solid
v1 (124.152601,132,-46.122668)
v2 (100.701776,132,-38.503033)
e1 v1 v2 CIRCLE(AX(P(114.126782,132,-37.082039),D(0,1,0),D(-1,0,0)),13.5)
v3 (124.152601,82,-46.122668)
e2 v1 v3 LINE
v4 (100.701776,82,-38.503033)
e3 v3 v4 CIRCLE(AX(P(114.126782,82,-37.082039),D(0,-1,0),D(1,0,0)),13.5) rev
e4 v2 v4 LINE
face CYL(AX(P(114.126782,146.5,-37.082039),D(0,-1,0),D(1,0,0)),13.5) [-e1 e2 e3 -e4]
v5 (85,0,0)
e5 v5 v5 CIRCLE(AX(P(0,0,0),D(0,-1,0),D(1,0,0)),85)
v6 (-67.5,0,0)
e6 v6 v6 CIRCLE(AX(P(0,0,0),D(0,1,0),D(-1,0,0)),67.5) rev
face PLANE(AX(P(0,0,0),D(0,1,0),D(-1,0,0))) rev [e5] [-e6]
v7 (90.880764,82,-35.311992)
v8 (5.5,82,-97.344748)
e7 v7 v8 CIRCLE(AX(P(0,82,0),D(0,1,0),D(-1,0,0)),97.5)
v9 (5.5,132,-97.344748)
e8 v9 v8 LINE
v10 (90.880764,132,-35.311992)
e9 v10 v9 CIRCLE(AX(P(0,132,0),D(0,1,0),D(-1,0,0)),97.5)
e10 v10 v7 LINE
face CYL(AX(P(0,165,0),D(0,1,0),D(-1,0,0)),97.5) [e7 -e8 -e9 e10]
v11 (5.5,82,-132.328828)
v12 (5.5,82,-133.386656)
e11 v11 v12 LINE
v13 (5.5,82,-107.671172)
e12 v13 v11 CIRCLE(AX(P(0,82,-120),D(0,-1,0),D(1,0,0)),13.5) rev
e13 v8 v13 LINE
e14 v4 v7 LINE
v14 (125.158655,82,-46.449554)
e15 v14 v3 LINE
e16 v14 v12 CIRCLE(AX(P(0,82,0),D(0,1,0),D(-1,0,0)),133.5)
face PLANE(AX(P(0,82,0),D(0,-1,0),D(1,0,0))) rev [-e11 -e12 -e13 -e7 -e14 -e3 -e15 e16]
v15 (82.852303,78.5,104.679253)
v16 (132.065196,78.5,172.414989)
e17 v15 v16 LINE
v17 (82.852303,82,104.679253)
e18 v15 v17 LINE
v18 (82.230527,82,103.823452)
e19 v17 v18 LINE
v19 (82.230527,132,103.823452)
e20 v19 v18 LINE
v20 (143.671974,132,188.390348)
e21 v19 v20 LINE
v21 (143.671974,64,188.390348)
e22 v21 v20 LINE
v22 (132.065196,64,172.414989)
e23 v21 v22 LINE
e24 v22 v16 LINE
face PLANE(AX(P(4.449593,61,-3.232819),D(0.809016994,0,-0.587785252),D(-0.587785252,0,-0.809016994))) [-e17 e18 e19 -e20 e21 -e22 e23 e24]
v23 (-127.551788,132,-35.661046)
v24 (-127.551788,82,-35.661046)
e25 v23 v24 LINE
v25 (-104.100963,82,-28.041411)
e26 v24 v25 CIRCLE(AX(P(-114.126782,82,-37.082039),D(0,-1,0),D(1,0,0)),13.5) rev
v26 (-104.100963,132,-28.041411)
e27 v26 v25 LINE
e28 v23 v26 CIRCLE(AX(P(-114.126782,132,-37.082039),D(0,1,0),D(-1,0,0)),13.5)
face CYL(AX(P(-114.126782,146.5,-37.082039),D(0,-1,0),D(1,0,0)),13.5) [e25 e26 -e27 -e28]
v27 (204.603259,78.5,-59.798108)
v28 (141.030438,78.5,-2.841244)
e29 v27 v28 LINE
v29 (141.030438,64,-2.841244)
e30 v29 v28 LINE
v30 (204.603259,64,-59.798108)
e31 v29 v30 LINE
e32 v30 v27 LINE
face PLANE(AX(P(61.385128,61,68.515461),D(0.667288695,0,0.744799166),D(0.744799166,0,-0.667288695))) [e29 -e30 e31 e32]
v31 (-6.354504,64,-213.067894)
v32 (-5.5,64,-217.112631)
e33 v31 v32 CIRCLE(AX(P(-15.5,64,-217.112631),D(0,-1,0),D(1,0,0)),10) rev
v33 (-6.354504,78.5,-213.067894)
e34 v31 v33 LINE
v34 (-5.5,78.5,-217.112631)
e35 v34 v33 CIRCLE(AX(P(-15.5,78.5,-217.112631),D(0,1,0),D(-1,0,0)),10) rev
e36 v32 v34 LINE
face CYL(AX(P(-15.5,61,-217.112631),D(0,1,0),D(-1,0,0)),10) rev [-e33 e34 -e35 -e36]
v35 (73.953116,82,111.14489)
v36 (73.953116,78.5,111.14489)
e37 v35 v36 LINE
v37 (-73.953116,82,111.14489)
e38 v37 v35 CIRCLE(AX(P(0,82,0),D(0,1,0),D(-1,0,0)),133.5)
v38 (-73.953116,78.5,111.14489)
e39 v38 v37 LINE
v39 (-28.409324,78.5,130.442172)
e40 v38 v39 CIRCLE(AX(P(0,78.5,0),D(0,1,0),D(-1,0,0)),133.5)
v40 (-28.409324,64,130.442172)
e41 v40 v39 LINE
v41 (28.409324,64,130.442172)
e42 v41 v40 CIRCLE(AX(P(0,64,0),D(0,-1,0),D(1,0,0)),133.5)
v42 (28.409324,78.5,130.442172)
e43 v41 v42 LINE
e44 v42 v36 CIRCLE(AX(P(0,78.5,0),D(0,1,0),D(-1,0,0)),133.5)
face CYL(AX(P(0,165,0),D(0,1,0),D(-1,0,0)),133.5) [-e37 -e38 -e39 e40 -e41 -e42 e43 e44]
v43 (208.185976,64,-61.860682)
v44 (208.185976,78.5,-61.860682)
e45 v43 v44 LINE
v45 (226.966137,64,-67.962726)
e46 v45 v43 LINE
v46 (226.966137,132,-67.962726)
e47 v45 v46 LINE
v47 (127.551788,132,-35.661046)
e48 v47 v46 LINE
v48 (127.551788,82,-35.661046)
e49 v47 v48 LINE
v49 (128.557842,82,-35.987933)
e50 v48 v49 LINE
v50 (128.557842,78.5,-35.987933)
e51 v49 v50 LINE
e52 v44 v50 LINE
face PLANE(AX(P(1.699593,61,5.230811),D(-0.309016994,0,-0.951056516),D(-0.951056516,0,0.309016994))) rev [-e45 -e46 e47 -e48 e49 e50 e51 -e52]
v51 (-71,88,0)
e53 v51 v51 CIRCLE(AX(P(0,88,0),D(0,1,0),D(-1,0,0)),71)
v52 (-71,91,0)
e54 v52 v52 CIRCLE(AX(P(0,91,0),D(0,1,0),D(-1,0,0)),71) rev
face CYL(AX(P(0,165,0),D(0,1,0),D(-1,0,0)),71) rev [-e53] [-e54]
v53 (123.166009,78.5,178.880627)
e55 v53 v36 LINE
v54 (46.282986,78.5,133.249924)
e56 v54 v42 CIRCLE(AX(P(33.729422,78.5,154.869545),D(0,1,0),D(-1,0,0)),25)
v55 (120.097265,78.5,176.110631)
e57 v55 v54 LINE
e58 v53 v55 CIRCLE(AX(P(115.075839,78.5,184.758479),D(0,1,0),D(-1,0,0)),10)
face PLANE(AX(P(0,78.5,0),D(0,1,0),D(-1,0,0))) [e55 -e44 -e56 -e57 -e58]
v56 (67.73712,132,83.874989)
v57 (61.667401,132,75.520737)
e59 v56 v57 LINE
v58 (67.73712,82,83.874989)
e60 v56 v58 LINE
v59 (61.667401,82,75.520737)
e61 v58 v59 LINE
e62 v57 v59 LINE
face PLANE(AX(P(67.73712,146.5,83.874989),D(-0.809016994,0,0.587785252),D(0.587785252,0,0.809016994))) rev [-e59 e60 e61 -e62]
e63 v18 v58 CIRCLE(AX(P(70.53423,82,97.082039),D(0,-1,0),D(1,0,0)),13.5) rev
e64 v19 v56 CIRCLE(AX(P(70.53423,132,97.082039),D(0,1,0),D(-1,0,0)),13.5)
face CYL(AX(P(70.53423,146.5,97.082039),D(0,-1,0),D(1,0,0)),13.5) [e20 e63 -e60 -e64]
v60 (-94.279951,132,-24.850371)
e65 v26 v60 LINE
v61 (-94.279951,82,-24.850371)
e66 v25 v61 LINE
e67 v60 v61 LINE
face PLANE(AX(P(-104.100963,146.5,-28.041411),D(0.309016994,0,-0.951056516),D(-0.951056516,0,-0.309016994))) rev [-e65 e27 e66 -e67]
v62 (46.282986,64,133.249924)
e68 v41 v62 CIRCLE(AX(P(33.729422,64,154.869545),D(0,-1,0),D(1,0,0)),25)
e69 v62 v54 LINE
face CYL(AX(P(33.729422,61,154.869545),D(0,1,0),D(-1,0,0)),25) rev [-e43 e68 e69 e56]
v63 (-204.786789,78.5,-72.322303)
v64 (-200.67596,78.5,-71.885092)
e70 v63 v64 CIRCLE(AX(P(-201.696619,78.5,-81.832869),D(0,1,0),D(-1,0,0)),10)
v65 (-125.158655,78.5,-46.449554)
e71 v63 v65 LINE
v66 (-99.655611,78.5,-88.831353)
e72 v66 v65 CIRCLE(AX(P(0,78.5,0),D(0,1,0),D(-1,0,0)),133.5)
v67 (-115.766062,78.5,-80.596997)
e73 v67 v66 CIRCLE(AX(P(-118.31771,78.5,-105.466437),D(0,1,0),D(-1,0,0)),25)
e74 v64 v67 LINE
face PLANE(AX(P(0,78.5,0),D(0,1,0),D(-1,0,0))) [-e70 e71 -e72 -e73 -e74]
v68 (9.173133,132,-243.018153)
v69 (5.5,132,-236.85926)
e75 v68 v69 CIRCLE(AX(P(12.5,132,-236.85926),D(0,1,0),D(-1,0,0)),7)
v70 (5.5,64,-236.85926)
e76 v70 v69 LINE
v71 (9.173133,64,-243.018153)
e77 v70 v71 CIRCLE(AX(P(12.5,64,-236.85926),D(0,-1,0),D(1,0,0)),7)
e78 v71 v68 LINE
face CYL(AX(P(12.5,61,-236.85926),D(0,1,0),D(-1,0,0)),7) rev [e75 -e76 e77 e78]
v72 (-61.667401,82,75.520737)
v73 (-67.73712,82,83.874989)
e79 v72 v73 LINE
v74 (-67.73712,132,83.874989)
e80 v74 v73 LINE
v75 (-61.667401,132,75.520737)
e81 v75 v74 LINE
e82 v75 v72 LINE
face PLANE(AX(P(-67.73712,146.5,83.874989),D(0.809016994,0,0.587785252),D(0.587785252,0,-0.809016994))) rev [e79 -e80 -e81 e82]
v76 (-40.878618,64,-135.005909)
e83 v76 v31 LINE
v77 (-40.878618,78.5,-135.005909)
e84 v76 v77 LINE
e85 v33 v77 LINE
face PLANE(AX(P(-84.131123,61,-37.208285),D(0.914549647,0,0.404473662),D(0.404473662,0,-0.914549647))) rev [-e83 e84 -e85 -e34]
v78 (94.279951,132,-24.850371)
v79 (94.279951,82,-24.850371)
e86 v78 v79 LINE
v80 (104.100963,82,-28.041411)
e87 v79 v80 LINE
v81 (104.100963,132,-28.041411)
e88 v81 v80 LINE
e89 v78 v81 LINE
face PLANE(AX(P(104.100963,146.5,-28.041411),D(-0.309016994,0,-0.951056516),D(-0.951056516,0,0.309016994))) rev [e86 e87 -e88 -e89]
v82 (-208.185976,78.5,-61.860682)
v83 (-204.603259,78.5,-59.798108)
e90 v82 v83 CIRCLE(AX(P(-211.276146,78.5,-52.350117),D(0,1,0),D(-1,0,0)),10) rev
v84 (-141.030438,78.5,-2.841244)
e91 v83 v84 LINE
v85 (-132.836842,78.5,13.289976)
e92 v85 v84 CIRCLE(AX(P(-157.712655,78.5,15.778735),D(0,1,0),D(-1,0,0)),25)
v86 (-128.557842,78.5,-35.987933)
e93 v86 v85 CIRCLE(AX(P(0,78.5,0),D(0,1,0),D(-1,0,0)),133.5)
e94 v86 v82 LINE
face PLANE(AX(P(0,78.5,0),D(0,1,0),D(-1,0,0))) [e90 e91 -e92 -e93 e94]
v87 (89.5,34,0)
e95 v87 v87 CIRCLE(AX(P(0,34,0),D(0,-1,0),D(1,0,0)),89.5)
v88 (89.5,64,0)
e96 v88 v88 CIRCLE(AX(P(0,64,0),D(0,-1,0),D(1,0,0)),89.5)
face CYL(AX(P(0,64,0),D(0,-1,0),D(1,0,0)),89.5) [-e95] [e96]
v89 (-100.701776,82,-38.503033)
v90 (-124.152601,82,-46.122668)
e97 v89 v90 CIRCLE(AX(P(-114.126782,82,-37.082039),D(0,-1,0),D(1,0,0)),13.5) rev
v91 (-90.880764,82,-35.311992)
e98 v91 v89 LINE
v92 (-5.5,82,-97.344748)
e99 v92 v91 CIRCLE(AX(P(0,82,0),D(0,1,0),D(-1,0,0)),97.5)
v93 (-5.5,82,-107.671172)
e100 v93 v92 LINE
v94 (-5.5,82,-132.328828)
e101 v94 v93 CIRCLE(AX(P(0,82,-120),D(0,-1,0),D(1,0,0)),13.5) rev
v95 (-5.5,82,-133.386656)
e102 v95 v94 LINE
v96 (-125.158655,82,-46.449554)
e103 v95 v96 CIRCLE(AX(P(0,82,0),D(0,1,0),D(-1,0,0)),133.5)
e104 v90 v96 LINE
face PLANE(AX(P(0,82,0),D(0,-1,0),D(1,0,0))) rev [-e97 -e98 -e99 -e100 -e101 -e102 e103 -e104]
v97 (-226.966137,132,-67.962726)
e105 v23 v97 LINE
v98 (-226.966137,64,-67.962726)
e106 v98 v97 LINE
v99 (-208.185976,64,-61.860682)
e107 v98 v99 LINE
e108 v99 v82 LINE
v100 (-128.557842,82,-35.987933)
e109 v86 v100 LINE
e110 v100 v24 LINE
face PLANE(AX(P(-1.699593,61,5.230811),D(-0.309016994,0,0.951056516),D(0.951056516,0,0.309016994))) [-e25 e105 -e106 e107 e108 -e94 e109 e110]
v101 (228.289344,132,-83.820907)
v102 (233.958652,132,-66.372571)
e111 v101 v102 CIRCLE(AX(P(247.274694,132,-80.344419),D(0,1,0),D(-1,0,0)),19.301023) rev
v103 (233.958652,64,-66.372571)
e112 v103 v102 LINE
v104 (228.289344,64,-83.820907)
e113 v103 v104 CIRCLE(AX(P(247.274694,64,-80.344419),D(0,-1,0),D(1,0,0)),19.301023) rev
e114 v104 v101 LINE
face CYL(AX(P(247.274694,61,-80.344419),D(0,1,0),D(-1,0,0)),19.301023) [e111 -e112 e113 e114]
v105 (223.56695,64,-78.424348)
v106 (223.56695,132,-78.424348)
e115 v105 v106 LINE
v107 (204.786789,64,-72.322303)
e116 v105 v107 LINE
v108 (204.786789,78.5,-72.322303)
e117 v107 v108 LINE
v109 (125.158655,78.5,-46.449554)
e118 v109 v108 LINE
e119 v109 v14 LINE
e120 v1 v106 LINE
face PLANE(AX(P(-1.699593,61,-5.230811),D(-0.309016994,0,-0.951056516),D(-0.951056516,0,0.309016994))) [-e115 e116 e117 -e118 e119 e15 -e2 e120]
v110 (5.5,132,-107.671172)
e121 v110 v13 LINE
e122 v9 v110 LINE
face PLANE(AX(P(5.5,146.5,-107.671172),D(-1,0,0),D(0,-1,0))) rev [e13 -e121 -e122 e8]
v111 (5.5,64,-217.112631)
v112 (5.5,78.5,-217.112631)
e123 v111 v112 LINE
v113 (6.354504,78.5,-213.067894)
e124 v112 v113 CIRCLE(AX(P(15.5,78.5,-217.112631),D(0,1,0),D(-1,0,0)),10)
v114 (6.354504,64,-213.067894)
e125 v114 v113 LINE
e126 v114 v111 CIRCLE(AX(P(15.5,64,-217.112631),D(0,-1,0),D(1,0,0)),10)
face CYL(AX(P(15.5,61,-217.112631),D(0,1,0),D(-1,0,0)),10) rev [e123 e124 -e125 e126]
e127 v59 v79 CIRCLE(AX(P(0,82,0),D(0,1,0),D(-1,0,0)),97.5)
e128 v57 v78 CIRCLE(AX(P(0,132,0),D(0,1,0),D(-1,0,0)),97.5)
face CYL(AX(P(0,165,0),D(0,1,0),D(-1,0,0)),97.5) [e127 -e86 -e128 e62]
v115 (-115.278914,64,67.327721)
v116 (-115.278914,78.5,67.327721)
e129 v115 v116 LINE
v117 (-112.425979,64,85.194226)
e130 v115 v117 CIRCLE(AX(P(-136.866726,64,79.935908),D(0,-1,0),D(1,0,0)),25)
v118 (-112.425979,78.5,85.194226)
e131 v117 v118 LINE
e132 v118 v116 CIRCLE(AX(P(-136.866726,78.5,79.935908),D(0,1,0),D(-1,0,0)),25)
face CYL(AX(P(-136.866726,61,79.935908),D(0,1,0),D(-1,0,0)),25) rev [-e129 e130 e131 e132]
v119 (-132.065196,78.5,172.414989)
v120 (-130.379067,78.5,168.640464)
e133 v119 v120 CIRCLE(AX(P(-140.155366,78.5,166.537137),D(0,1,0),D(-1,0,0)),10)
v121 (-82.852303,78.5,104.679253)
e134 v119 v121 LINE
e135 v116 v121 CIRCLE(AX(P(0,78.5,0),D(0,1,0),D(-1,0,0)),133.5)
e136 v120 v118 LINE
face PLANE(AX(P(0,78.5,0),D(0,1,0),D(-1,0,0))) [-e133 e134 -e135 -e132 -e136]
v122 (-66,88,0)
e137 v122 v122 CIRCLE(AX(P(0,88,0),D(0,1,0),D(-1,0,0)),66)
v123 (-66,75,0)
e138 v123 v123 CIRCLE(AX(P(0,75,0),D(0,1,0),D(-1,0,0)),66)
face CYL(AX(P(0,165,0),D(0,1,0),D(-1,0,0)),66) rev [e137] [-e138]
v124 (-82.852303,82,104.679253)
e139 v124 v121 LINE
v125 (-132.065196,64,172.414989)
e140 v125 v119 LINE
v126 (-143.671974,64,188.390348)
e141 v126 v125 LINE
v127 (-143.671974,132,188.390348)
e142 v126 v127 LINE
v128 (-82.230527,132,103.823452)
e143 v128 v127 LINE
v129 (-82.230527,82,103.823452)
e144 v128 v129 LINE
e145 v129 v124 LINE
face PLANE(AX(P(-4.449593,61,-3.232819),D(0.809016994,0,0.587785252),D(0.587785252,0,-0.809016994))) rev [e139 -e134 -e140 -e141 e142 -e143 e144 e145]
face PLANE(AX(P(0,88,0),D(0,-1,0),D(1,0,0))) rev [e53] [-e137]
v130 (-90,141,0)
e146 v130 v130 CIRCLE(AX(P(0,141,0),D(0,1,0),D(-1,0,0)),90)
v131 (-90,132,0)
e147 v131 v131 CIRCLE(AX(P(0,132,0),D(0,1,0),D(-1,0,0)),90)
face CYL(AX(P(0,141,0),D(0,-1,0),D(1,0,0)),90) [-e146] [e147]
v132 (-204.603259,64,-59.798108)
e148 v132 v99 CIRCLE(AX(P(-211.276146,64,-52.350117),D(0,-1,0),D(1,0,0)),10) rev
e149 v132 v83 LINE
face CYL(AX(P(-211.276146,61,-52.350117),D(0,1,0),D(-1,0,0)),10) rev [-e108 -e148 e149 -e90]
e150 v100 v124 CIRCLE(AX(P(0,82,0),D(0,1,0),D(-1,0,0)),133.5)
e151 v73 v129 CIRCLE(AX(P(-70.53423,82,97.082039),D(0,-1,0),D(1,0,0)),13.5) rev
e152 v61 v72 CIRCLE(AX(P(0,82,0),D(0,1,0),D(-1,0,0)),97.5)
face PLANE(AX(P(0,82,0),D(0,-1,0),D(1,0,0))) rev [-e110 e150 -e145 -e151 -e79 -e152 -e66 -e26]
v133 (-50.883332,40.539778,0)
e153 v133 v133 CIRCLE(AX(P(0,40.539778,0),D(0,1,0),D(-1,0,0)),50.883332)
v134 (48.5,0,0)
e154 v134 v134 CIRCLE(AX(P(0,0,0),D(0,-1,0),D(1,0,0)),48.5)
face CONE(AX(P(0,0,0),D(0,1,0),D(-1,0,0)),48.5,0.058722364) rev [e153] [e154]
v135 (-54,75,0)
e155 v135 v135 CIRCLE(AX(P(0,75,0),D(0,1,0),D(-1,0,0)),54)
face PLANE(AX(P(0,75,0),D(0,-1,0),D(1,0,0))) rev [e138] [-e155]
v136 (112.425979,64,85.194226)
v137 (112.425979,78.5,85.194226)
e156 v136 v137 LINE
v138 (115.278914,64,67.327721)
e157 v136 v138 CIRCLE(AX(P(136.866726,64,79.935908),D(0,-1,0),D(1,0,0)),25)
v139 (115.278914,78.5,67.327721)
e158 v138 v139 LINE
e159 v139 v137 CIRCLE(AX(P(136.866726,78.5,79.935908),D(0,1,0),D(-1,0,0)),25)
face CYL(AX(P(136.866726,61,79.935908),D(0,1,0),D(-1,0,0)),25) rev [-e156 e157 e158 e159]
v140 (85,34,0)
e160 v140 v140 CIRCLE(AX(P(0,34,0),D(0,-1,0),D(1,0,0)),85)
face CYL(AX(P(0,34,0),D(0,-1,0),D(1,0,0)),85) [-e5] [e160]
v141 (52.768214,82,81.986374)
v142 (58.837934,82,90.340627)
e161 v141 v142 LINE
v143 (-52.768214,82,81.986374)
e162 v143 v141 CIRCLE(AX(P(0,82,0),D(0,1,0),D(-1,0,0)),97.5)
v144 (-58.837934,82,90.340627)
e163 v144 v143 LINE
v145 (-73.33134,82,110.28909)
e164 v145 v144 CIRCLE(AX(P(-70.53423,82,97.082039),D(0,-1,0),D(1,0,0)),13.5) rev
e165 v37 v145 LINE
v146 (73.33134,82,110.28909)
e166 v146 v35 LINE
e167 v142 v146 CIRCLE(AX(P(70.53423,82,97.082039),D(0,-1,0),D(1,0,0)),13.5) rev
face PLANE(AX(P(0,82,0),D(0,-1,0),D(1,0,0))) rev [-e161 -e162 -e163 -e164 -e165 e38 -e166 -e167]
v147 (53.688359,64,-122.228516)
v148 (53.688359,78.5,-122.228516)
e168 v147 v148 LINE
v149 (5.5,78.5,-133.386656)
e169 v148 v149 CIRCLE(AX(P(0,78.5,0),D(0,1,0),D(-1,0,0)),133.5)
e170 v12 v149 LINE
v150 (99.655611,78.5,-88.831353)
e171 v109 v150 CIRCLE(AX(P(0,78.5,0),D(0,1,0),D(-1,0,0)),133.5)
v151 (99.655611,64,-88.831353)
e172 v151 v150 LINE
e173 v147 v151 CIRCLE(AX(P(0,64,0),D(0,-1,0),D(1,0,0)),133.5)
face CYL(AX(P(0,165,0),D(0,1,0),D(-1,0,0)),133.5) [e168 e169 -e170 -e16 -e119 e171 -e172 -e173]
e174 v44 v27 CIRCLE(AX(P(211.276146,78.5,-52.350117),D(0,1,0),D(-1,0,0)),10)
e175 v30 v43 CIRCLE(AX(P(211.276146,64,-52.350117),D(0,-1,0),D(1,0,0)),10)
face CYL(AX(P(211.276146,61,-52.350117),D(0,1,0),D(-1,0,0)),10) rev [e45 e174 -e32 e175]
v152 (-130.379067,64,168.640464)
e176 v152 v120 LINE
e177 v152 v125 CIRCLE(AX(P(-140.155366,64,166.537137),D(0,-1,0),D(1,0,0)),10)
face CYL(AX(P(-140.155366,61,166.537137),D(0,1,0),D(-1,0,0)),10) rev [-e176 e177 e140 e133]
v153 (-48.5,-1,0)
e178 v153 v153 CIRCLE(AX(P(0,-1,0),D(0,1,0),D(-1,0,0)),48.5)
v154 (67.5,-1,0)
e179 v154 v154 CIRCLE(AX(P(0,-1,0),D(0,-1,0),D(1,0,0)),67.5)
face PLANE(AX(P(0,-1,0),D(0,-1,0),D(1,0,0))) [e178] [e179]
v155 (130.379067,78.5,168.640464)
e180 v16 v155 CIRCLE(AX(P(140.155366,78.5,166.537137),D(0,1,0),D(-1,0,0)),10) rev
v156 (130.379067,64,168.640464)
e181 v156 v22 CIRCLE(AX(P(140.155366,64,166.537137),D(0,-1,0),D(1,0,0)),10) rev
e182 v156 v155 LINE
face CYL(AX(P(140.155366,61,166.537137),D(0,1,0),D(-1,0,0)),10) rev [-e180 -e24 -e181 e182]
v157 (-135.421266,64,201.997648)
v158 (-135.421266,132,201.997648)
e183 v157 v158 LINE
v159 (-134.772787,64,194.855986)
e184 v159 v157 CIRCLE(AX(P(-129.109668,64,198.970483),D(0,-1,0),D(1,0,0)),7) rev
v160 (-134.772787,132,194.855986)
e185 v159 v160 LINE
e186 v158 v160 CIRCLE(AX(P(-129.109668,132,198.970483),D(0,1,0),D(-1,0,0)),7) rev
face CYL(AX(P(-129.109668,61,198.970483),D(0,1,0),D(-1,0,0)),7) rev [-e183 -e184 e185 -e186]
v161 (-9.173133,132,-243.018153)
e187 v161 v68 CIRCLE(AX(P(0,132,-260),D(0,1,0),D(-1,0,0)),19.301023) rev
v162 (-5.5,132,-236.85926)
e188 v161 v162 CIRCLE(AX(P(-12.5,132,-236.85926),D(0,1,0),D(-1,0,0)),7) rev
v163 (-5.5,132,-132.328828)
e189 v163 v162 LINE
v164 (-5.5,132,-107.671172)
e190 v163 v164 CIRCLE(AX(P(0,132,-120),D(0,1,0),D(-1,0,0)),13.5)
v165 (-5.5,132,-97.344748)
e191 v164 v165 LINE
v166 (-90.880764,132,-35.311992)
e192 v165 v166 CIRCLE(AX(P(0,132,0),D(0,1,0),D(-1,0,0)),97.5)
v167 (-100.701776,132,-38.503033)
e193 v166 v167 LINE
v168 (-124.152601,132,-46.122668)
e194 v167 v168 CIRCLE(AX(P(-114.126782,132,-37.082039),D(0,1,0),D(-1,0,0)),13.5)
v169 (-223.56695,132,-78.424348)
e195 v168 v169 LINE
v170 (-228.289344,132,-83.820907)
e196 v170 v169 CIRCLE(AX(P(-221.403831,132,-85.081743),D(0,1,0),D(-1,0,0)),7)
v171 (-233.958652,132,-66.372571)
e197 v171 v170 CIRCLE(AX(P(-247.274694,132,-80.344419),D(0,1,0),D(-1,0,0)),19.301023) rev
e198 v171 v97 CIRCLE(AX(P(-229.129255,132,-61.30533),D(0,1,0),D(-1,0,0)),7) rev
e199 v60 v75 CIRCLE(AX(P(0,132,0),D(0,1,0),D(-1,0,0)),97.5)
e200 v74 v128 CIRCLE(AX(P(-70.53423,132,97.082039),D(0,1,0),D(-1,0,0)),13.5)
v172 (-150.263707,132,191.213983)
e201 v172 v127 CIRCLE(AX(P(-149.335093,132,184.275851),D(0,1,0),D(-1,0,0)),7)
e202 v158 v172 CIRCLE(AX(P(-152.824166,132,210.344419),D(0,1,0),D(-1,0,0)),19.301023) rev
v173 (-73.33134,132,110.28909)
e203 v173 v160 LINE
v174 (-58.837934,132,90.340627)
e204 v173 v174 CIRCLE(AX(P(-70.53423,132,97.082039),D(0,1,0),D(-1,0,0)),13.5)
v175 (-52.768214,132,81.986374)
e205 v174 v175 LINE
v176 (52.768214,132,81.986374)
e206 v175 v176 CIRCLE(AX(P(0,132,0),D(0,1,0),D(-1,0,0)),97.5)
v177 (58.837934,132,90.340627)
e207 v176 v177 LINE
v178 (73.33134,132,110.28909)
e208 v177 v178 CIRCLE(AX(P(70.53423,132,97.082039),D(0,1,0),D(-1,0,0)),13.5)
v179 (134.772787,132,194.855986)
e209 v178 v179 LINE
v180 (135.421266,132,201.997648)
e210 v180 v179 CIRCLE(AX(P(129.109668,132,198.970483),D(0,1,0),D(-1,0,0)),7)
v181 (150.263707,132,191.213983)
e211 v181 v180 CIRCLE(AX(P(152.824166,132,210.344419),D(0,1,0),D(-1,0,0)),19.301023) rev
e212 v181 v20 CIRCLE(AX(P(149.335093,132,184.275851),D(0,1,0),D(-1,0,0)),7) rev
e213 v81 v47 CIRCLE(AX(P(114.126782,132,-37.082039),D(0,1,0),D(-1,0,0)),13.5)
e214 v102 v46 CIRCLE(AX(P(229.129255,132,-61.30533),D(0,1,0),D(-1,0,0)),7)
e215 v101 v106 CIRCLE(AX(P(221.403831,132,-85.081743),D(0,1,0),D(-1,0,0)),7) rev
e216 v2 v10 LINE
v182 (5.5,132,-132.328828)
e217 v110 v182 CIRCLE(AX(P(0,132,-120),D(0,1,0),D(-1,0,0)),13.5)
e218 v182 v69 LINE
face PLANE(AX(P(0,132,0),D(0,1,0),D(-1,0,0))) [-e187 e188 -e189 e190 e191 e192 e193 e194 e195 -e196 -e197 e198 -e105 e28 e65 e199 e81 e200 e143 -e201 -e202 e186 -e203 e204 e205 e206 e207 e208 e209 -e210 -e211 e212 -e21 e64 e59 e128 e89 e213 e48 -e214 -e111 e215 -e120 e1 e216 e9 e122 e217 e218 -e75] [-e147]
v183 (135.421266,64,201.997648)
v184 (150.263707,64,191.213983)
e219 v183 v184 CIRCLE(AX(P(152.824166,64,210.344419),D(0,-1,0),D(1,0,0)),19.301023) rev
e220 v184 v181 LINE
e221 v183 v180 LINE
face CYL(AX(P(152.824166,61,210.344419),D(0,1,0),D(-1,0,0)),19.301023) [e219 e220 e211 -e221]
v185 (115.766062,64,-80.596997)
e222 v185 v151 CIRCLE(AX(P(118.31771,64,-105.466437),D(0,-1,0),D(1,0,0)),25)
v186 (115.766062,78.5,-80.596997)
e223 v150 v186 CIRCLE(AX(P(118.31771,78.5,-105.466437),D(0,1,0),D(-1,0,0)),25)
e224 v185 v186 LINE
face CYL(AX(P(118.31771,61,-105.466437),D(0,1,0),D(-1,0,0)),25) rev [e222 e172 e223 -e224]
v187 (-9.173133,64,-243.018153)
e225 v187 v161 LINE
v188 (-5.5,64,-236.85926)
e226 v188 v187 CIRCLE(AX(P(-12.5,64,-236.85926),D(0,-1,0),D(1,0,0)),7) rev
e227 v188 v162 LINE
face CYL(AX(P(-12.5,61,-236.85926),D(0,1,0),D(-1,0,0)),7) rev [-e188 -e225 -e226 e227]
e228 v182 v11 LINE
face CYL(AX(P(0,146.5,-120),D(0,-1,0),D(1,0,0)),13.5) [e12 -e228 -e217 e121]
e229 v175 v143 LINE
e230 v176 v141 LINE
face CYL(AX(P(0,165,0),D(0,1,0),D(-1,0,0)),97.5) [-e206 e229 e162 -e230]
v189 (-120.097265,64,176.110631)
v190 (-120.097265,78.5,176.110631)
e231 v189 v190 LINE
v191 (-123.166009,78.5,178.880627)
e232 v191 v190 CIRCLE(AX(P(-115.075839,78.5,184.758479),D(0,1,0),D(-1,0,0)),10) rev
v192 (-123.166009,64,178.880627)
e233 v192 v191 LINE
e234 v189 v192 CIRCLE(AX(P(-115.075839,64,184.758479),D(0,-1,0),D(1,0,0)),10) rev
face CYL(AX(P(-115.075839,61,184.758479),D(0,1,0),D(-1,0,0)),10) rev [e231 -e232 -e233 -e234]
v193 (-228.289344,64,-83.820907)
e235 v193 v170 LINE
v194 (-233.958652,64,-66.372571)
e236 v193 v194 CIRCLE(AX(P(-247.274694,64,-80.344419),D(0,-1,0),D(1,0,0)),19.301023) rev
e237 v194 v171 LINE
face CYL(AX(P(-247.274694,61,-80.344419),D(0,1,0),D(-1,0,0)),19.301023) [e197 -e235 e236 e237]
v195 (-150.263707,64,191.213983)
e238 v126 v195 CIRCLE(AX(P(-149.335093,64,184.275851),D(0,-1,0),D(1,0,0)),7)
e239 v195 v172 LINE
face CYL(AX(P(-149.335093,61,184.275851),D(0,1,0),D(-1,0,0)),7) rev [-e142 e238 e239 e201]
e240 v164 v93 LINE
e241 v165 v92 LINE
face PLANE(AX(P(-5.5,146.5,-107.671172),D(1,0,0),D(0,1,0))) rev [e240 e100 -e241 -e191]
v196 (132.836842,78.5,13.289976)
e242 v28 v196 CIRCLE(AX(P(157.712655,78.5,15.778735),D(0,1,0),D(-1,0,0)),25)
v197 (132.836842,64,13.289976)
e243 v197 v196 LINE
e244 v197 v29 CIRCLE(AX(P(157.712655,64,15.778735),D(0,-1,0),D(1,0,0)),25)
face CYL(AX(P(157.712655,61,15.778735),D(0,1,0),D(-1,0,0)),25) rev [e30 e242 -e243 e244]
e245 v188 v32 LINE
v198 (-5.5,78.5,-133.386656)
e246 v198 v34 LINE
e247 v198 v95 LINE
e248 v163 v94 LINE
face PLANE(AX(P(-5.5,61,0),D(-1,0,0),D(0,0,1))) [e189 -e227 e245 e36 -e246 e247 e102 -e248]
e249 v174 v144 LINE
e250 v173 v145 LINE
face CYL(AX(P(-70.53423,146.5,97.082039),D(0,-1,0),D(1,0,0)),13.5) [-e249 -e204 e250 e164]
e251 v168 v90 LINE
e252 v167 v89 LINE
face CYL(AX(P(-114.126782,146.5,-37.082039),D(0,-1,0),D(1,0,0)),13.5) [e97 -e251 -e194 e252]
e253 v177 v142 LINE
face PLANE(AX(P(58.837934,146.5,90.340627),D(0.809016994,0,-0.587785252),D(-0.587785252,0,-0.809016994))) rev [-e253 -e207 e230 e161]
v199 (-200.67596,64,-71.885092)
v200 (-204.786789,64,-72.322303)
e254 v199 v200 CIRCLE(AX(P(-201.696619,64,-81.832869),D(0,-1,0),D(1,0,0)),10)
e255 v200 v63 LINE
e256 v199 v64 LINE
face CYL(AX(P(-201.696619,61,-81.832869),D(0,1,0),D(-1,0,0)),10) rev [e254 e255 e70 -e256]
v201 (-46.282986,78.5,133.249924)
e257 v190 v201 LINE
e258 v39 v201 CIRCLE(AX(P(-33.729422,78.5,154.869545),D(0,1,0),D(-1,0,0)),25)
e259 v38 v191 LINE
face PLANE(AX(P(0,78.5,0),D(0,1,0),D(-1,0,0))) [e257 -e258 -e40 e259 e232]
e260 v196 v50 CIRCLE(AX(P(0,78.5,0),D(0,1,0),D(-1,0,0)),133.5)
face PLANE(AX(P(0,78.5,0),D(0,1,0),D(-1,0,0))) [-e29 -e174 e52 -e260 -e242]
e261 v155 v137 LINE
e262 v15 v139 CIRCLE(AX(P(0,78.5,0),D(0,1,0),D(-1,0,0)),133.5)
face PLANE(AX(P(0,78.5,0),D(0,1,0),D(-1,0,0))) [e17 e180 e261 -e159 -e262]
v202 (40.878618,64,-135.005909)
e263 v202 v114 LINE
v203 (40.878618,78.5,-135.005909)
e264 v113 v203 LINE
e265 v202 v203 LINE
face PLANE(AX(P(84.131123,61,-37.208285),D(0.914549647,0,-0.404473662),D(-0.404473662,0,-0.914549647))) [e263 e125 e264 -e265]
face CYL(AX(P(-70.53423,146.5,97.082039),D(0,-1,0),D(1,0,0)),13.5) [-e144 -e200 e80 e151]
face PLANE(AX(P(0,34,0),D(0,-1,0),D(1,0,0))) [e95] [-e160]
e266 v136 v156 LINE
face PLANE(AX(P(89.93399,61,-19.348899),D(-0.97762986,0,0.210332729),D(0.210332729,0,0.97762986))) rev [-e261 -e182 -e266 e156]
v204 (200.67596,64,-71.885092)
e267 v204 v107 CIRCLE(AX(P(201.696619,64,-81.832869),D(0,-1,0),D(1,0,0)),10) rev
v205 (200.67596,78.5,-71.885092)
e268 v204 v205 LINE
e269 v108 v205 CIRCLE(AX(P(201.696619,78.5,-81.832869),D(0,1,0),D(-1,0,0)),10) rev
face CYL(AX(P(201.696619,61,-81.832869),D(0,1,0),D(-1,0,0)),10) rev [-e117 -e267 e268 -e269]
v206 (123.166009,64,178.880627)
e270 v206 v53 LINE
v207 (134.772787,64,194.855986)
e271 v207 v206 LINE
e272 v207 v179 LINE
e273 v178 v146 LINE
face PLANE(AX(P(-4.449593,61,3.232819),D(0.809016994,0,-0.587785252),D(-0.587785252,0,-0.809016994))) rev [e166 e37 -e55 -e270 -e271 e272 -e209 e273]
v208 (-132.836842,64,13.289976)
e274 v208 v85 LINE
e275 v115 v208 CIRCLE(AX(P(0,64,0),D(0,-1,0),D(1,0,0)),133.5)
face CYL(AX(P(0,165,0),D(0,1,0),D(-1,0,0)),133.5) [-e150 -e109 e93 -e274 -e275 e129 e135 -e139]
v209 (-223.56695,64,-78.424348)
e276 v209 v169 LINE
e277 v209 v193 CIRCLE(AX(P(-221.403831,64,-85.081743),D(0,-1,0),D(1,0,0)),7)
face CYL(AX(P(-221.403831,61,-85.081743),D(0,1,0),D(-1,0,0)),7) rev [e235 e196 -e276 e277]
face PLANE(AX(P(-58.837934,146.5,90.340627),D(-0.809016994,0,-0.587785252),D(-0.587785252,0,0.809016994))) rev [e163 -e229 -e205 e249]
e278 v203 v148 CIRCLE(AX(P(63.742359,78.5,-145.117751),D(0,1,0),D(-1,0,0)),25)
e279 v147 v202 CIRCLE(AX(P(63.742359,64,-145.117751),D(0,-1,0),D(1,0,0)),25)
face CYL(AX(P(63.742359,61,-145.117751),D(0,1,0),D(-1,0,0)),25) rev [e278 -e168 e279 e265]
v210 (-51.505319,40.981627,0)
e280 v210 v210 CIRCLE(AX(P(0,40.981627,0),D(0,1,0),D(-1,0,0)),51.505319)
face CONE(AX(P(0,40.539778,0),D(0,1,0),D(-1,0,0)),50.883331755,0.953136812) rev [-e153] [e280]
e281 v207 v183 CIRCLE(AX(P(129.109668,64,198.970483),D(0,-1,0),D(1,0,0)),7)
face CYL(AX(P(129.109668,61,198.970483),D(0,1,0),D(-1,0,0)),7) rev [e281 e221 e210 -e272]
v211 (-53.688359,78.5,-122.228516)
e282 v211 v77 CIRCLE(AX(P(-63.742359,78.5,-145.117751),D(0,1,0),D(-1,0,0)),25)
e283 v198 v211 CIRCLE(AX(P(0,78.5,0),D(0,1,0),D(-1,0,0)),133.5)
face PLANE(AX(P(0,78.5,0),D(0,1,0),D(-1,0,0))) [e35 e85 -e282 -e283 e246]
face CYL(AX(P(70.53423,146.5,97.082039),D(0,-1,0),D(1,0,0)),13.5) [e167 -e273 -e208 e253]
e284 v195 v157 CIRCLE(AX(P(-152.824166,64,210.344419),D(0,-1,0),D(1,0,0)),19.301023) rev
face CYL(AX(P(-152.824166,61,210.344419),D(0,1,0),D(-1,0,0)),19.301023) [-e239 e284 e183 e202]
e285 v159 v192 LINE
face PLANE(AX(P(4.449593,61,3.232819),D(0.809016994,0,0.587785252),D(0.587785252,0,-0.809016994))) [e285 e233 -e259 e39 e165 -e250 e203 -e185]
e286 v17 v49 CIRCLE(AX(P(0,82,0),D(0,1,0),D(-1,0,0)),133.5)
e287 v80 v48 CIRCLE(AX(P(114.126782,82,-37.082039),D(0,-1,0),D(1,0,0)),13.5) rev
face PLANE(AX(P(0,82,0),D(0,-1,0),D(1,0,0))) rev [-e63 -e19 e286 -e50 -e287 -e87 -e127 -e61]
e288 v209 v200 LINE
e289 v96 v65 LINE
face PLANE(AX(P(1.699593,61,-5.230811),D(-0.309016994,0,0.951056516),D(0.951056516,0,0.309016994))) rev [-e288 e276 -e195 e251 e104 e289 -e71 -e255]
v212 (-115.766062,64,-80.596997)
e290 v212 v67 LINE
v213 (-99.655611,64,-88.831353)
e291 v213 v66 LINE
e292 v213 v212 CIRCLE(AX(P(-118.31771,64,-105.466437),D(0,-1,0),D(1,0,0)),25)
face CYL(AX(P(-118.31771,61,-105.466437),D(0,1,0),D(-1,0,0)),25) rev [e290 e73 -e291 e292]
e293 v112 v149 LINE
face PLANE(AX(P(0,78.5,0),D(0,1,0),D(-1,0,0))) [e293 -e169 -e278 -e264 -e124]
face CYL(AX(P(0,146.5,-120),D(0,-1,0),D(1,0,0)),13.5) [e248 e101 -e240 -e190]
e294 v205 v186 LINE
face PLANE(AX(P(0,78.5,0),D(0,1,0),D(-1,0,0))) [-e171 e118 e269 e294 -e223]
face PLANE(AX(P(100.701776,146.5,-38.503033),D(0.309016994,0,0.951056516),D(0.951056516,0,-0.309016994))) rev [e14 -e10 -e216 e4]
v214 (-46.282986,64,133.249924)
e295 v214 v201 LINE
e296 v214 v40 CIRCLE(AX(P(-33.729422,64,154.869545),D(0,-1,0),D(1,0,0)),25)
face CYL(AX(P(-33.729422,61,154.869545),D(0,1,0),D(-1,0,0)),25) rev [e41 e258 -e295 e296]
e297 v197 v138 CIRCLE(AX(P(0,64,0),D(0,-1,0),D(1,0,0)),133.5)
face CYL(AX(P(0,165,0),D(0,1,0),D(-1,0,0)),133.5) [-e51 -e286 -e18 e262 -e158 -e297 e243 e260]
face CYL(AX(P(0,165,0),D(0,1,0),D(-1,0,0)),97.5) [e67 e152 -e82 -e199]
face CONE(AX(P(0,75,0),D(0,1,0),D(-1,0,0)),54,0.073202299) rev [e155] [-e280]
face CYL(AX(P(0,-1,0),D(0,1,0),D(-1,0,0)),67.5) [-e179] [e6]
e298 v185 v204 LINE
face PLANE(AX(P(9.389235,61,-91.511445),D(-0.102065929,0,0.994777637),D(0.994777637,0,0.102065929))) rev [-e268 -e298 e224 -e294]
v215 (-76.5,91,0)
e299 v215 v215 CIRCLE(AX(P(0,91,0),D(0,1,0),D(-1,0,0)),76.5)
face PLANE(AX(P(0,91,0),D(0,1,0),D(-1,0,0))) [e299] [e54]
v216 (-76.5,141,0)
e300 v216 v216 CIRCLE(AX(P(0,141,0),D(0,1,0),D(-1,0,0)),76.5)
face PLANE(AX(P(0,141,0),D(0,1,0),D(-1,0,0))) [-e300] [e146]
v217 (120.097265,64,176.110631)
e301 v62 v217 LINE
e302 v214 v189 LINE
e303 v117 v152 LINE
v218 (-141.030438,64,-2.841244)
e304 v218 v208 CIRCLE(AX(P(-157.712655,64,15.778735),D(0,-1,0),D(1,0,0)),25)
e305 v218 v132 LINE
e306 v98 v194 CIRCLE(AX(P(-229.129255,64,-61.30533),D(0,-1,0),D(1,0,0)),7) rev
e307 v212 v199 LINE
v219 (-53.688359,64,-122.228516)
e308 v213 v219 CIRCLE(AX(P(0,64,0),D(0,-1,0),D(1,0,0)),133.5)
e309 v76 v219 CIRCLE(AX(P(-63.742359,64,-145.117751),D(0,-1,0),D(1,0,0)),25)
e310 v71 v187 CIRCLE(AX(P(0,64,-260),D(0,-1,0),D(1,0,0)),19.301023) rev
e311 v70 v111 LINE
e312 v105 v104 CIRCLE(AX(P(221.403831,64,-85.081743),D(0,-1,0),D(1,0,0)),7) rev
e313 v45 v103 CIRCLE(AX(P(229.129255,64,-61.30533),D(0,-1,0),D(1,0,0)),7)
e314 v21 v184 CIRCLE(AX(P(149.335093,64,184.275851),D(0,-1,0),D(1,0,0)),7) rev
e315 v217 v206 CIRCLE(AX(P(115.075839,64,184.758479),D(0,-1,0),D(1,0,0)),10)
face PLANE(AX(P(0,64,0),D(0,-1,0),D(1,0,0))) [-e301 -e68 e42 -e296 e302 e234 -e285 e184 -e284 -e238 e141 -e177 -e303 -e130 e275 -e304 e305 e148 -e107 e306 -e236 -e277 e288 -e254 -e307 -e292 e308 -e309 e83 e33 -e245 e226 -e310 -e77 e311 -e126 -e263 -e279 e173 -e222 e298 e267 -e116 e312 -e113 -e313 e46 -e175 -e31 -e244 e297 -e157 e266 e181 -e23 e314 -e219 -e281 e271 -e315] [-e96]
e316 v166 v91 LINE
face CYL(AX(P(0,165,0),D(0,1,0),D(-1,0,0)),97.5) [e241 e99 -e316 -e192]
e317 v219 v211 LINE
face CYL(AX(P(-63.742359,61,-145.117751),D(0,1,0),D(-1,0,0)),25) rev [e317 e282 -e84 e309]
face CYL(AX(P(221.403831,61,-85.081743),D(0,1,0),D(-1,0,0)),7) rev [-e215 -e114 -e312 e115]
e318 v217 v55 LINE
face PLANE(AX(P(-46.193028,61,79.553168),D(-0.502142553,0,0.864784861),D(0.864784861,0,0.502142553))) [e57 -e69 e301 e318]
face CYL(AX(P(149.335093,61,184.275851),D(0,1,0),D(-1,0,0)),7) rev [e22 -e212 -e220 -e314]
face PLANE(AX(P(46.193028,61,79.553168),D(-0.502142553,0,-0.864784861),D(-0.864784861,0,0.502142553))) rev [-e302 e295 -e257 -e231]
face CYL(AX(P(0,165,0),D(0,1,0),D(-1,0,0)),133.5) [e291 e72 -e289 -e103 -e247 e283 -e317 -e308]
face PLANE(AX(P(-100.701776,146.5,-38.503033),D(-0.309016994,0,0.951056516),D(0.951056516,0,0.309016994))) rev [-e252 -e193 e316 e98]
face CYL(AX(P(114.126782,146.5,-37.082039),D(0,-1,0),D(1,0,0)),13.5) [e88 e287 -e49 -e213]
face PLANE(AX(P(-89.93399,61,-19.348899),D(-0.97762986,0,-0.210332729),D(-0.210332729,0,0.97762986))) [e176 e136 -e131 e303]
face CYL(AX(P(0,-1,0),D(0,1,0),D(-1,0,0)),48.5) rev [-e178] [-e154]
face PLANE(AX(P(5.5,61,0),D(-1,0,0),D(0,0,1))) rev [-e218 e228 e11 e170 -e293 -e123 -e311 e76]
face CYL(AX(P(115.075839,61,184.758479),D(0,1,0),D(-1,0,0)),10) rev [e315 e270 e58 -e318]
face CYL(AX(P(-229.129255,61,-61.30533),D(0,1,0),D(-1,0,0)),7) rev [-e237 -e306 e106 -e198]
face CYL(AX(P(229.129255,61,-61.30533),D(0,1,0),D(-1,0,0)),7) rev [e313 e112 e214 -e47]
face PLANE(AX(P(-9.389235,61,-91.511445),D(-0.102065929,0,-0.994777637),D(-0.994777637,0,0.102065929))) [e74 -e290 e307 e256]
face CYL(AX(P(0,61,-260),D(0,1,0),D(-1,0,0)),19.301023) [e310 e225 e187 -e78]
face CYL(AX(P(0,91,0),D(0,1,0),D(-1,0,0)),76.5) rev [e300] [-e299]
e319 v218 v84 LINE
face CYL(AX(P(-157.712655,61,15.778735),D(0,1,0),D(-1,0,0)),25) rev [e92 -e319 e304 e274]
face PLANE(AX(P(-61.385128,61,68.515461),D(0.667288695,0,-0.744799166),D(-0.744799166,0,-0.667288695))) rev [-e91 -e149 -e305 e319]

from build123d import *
from build123d.topology import SkipClean

# Parameters (mm, degrees)
BOSS_EXTRUDE1_DEPTH     = 21
CIRPATTERN1_COUNT       = 5
SKETCH3_R               = 294.674158119
SKETCH3_R_2             = 133.5
CUT_EXTRUDE1_DEPTH      = 3.5
BOSS_EXTRUDE2_START     = 68
BOSS_EXTRUDE2_DEPTH     = 68
CIRPATTERN2_COUNT       = 5
SKETCH6_R               = 312.065811201
CUT_EXTRUDE3_DEPTH      = 15
SKETCH7_R               = 90
SKETCH7_R_2             = 71
BOSS_EXTRUDE3_DEPTH     = 9
SKETCH8_R               = 76.5
CUT_EXTRUDE4_DEPTH      = 50
SKETCH9_R               = 313.84536257
SKETCH9_R_2             = 94
CUT_EXTRUDE5_DEPTH      = 3
SKETCH10_R              = 106.760596323
SKETCH10_R_2            = 85
CUT_EXTRUDE6_DEPTH      = 34
SKETCH11_R              = 112.872926099
SKETCH11_R_2            = 89.5
CUT_EXTRUDE7_DEPTH      = 30
SKETCH12_R              = 67.5
SKETCH12_R_2            = 45
BOSS_EXTRUDE4_DEPTH     = 1
CUT_EXTRUDE8_DEPTH      = 412.038532061
CUT_EXTRUDE8_DEPTH_BACK = 412.038532061
SKETCH13_R              = 48.5


with BuildPart() as part:
    # Sketch1 → Revolve1 (revolve)
    with BuildSketch(Plane.XY):
        with BuildLine():
            ThreePointArc((86.867753099, 0), (88.846350287, 0.744971582), (89.84228169, 2.60989789))
            Line((89.84228169, 2.60989789), (97.5, 61))
            Line((97.5, 61), (133.5, 61))
            Line((133.5, 61), (133.5, 82))
            Line((133.5, 82), (97.5, 82))
            Line((97.5, 82), (97.5, 147))
            Line((97.5, 147), (71, 147))
            Line((71, 147), (71, 88))
            Line((71, 88), (66, 88))
            Line((66, 88), (66, 75))
            Line((66, 75), (54, 75))
            Line((54, 75), (51.505319297, 40.981626783))
            Line((51.505319297, 40.981626783), (50.883331755, 40.539778313))
            Line((50.883331755, 40.539778313), (48.5, 0))
            Line((48.5, 0), (86.867753099, 0))
        make_face()
    revolve(axis=Axis((0, 165, 0), (0, -1, 0)))

    # Sketch2 → Boss-Extrude1 (add)
    with BuildSketch(Plane(origin=(0, 82, 0), x_dir=(1, 0, 0), z_dir=(0, 1, 0))):
        with BuildLine():
            Line((-6.35450353, 213.067894216), (-40.878618186, 135.005909342))
            ThreePointArc((-40.878618186, 135.005909342), (-46.087052335, 127.41774711), (-53.688359463, 122.228515733))
            ThreePointArc((-53.688359463, 122.228515733), (0, 133.5), (53.688359463, 122.228515733))
            ThreePointArc((53.688359463, 122.228515733), (46.087052335, 127.41774711), (40.878618186, 135.005909342))
            Line((40.878618186, 135.005909342), (6.35450353, 213.067894216))
            ThreePointArc((6.35450353, 213.067894216), (5.71595777, 215.045623904), (5.5, 217.112630835))
            Line((5.5, 217.112630835), (5.5, 236.859260412))
            ThreePointArc((5.5, 236.859260412), (6.48800918, 240.444782185), (9.173133251, 243.018152978))
            ThreePointArc((9.173133251, 243.018152978), (18.712249031, 264.730881325), (0, 279.301023339))
            ThreePointArc((0, 279.301023339), (-18.712249031, 264.730881325), (-9.173133251, 243.018152978))
            ThreePointArc((-9.173133251, 243.018152978), (-6.48800918, 240.444782185), (-5.5, 236.859260412))
            Line((-5.5, 236.859260412), (-5.5, 217.112630835))
            ThreePointArc((-5.5, 217.112630835), (-5.71595777, 215.045623904), (-6.35450353, 213.067894216))
        make_face()
    boss_extrude1 = extrude(amount=-BOSS_EXTRUDE1_DEPTH)

    # CirPattern1: Boss-Extrude1 ×5 about axis
    cirpattern1_axis = Axis((0, 165, 0), (0, 1, 0))
    for i in range(1, CIRPATTERN1_COUNT):
        add(boss_extrude1.rotate(cirpattern1_axis, i * 360 / CIRPATTERN1_COUNT))

    # Sketch3 → Cut-Extrude1 (cut)
    with BuildSketch(Plane(origin=(0, 82, 0), x_dir=(1, 0, 0), z_dir=(0, 1, 0))):
        Circle(SKETCH3_R)
        Circle(SKETCH3_R_2, mode=Mode.SUBTRACT)
    extrude(amount=-CUT_EXTRUDE1_DEPTH, mode=Mode.SUBTRACT)

    # Sketch4 → Boss-Extrude2 (add)
    with SkipClean():  # the faces are left unmerged after this step: merging them gives an invalid solid
        with BuildSketch(Plane(origin=(0, 78.5, 0), x_dir=(1, 0, 0), z_dir=(0, 1, 0)).offset(BOSS_EXTRUDE2_START)):
            with BuildLine():
                Line((-5.5, 236.859260412), (-5.5, 132.328828006))
                ThreePointArc((-5.5, 132.328828006), (-13.5, 120), (-5.5, 107.671171994))
                Line((-5.5, 107.671171994), (-5.5, 97.344748189))
                ThreePointArc((-5.5, 97.344748189), (0, 97.5), (5.5, 97.344748189))
                Line((5.5, 97.344748189), (5.5, 107.671171994))
                ThreePointArc((5.5, 107.671171994), (13.5, 120), (5.5, 132.328828006))
                Line((5.5, 132.328828006), (5.5, 236.859260412))
                ThreePointArc((5.5, 236.859260412), (6.48800918, 240.444782185), (9.173133251, 243.018152978))
                ThreePointArc((9.173133251, 243.018152978), (0, 279.301023339), (-9.173133251, 243.018152978))
                ThreePointArc((-9.173133251, 243.018152978), (-6.48800918, 240.444782185), (-5.5, 236.859260412))
            make_face()
        boss_extrude2 = extrude(amount=-BOSS_EXTRUDE2_DEPTH)
    add(part.part.scale(1), mode=Mode.REPLACE)  # the faces are merged on a copy

    # CirPattern2: Boss-Extrude2 ×5 about axis
    cirpattern2_axis = Axis((0, 165, 0), (0, 1, 0))
    for i in range(1, CIRPATTERN2_COUNT):
        add(boss_extrude2.rotate(cirpattern2_axis, i * 360 / CIRPATTERN2_COUNT))

    # Sketch6 → Cut-Extrude3 (cut)
    with BuildSketch(Plane(origin=(0, 147, 0), x_dir=(1, 0, 0), z_dir=(0, 1, 0))):
        Circle(SKETCH6_R)
    extrude(amount=-CUT_EXTRUDE3_DEPTH, mode=Mode.SUBTRACT)

    # Sketch7 → Boss-Extrude3 (add)
    with BuildSketch(Plane(origin=(0, 132, 0), x_dir=(1, 0, 0), z_dir=(0, 1, 0))):
        Circle(SKETCH7_R)
        Circle(SKETCH7_R_2, mode=Mode.SUBTRACT)
    extrude(amount=BOSS_EXTRUDE3_DEPTH)

    # Sketch8 → Cut-Extrude4 (cut)
    with BuildSketch(Plane(origin=(0, 141, 0), x_dir=(1, 0, 0), z_dir=(0, 1, 0))):
        Circle(SKETCH8_R)
    extrude(amount=-CUT_EXTRUDE4_DEPTH, mode=Mode.SUBTRACT)

    # Sketch9 → Cut-Extrude5 (cut)
    with BuildSketch(Plane.XZ.offset(-61)):
        Circle(SKETCH9_R)
        Circle(SKETCH9_R_2, mode=Mode.SUBTRACT)
    extrude(amount=-CUT_EXTRUDE5_DEPTH, mode=Mode.SUBTRACT)

    # Sketch10 → Cut-Extrude6 (cut)
    with BuildSketch(Plane.XZ):
        Circle(SKETCH10_R)
        Circle(SKETCH10_R_2, mode=Mode.SUBTRACT)
    extrude(amount=-CUT_EXTRUDE6_DEPTH, mode=Mode.SUBTRACT)

    # Sketch11 → Cut-Extrude7 (cut)
    with BuildSketch(Plane.XZ.offset(-34)):
        Circle(SKETCH11_R)
        Circle(SKETCH11_R_2, mode=Mode.SUBTRACT)
    extrude(amount=-CUT_EXTRUDE7_DEPTH, mode=Mode.SUBTRACT)

    # Sketch12 → Boss-Extrude4 (add)
    with BuildSketch(Plane.XZ):
        Circle(SKETCH12_R)
        Circle(SKETCH12_R_2, mode=Mode.SUBTRACT)
    extrude(amount=BOSS_EXTRUDE4_DEPTH)

    # Sketch13 → Cut-Extrude8 (cut, two sides: drawn at the far end of the back side and taken through both)
    with BuildSketch(Plane(origin=(0, 0, 0), x_dir=(1, 0, 0), z_dir=(0, 1, 0)).offset(-CUT_EXTRUDE8_DEPTH_BACK)):
        Circle(SKETCH13_R)
    extrude(amount=CUT_EXTRUDE8_DEPTH + CUT_EXTRUDE8_DEPTH_BACK, mode=Mode.SUBTRACT)


solid = part.part
